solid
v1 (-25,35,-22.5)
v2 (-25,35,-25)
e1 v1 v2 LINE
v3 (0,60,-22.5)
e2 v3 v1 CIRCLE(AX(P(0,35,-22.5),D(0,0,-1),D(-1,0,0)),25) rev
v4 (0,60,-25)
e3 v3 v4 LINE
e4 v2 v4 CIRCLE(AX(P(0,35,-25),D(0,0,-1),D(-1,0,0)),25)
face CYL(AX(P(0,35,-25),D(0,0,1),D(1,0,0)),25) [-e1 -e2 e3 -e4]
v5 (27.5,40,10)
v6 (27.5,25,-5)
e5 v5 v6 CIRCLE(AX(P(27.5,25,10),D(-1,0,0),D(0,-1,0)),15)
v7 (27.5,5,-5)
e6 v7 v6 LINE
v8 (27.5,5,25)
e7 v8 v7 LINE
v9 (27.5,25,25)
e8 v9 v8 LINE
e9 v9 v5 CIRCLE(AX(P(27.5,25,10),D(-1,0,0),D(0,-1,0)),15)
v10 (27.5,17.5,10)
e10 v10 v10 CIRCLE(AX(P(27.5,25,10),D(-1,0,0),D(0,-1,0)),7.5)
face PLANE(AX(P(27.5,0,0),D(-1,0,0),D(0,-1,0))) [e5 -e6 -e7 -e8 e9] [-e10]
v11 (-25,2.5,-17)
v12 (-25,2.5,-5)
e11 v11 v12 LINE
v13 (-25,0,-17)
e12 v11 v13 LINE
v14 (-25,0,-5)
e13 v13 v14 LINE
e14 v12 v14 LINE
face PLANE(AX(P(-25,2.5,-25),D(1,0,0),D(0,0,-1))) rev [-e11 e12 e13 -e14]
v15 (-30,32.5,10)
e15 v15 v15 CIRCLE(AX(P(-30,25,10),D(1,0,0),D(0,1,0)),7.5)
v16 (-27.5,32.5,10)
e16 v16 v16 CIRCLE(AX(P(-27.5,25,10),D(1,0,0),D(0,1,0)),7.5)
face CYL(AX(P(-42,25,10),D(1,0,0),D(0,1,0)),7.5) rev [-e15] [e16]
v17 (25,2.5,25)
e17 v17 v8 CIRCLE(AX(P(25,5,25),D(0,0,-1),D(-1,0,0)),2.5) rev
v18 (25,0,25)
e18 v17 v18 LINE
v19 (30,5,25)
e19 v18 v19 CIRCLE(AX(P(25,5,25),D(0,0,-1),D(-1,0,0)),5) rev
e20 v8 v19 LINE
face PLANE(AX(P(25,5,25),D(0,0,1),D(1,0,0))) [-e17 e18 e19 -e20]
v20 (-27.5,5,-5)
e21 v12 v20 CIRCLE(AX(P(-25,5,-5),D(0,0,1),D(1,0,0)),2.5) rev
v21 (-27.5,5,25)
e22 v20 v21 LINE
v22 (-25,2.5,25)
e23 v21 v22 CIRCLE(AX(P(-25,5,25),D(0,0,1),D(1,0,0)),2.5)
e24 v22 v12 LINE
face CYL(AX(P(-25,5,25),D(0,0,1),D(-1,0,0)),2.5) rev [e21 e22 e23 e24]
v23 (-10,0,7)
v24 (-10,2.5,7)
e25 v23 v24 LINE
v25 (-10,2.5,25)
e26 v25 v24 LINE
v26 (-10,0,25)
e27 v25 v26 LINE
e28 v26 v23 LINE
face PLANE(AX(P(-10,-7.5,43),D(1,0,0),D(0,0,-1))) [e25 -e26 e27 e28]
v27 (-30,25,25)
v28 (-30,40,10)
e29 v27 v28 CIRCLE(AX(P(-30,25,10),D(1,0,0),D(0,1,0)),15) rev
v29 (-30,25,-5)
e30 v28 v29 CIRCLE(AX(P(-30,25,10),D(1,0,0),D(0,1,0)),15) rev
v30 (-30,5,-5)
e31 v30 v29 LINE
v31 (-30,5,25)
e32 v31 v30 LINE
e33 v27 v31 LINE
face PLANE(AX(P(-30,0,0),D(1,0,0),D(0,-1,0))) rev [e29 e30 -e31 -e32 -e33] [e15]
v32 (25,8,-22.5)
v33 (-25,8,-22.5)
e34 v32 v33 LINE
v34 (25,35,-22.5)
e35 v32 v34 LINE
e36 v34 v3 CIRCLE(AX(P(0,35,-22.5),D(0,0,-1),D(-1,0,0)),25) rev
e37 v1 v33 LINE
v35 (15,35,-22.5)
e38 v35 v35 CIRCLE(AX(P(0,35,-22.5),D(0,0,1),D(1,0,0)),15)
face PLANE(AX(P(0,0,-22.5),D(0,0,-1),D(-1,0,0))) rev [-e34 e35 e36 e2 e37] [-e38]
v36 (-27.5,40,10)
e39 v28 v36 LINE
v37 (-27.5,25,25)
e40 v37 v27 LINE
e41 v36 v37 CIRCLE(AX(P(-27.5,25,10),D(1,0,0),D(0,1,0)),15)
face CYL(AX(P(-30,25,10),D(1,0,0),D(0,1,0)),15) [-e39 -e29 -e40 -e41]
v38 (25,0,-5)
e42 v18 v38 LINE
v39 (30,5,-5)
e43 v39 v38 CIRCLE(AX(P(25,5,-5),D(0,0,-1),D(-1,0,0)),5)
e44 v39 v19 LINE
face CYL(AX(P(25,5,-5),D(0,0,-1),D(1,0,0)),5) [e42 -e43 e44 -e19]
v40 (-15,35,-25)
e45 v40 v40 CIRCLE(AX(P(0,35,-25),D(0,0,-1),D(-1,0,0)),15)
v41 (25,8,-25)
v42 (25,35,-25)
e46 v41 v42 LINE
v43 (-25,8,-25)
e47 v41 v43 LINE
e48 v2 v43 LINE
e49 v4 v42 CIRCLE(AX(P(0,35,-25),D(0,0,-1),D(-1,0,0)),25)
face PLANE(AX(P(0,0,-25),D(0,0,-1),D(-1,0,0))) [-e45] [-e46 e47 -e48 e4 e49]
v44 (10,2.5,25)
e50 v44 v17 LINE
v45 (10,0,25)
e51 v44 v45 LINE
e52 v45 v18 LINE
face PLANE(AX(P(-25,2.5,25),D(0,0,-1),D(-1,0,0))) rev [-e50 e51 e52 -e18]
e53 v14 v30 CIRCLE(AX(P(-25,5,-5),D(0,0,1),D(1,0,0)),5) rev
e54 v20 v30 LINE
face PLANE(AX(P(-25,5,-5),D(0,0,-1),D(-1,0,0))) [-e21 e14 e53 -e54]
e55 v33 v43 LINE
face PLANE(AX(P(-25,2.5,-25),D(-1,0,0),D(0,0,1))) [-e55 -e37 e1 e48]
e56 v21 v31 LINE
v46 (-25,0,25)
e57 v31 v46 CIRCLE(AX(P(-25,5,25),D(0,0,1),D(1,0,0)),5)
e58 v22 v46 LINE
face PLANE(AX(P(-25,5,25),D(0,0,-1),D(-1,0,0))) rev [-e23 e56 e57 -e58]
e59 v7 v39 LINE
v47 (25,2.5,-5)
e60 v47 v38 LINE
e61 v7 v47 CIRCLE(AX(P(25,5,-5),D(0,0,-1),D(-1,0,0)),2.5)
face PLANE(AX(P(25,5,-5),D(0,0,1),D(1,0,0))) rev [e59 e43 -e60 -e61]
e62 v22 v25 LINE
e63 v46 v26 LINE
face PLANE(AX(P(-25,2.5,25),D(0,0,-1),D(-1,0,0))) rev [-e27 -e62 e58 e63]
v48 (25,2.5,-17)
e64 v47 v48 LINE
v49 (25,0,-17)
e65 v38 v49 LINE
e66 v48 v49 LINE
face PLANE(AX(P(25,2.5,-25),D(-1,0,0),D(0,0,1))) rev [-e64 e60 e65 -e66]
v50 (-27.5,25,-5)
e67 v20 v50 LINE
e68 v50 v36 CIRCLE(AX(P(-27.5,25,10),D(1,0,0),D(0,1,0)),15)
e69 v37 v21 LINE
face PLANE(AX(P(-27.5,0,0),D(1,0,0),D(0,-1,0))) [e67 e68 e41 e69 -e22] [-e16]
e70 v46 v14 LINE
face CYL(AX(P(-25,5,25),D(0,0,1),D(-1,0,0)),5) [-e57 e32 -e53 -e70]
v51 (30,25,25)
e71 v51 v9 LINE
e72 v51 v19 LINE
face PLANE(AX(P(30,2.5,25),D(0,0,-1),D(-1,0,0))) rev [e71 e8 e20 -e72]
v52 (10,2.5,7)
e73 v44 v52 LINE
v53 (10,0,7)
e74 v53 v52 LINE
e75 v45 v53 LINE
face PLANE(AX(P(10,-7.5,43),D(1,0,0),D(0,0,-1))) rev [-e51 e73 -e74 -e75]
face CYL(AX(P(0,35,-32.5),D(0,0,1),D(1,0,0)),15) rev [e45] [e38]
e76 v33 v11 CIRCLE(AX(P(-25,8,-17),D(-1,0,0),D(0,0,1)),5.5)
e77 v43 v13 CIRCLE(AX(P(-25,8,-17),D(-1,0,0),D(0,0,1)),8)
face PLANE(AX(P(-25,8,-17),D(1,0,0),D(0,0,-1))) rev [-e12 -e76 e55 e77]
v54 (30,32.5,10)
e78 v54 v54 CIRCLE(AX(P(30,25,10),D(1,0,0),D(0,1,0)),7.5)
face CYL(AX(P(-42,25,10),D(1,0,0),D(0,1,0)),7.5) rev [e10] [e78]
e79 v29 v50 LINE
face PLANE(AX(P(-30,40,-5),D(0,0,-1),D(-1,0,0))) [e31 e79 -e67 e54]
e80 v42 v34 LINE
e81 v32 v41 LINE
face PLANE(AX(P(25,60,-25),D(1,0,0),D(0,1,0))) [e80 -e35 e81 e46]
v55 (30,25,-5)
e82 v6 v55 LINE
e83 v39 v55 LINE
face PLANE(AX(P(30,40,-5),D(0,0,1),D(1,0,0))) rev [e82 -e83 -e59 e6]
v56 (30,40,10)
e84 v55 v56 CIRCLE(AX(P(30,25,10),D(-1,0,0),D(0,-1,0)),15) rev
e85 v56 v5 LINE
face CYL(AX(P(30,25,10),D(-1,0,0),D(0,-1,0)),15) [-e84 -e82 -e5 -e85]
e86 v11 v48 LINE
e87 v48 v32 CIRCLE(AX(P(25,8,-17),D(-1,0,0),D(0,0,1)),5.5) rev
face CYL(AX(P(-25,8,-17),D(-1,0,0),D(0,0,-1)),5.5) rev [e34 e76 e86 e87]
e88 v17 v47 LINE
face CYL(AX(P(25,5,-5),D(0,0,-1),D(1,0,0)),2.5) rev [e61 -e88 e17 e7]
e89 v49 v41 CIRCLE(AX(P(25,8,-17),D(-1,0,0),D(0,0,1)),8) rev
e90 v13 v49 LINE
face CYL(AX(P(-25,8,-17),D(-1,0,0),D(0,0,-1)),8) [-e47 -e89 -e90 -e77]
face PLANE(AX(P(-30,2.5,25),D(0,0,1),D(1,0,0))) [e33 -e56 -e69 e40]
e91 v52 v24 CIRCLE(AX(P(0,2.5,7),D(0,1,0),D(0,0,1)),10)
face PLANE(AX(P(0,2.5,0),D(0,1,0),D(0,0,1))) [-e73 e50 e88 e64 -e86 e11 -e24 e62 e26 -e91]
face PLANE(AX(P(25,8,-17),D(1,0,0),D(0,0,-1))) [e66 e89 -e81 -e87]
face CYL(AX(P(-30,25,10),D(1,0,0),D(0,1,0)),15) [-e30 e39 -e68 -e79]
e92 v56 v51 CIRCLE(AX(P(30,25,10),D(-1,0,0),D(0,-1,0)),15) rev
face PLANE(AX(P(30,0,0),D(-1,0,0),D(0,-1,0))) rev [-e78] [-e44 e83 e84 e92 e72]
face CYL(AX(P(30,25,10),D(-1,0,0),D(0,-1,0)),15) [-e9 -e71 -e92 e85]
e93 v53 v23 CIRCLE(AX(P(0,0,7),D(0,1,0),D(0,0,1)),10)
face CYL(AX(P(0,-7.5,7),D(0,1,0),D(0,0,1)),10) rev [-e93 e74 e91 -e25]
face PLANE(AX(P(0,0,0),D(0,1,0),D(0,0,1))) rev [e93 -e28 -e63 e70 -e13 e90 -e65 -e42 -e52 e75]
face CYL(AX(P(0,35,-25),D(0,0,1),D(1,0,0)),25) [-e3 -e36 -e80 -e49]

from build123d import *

# Parameters (mm, degrees)
SKETCH1_W                    = 50
SKETCH1_H                    = 50
BASE_FLANGE1_DEPTH           = 2.5
EDGE_FLANGE2_STRIP_W         = 21
EDGE_FLANGE2_STRIP_H         = 2.5
EDGE_FLANGE2_STRIP_CUT_DEPTH = 50
EDGE_FLANGE2_DEPTH           = 50
BREAK_CORNER2_START          = -25
BREAK_CORNER2_DEPTH          = 2.5
EDGE_FLANGE4_DEPTH           = 30
SKETCH29_R                   = 15
CUT_EXTRUDE1_DEPTH           = 10
CUT_EXTRUDE2_DEPTH           = 10
BREAK_CORNER3_START          = -30
BREAK_CORNER3_DEPTH          = 60
SKETCH31_R                   = 7.5
CUT_EXTRUDE3_DEPTH           = 72


# Read off the part's stored shape, not the designer's step: Break-Corner2, Break-Corner3
# Sheet-metal steps are written as plain solids
with BuildPart() as part:
    # Sketch1 → Base-Flange1 (new body)
    with BuildSketch(Plane(origin=(0, 0, 0), x_dir=(1, 0, 0), z_dir=(0, 1, 0))):
        Rectangle(SKETCH1_W, SKETCH1_H)
    extrude(amount=BASE_FLANGE1_DEPTH)

    # Edge-Flange2 strip (across the edge) → Edge-Flange2 strip cut (cut)
    with BuildSketch(Plane(origin=(25, 2.5, -25), x_dir=(0, 0, 1), z_dir=(-1, 0, 0))):
        with Locations((-2.5, -1.25)):
            Rectangle(EDGE_FLANGE2_STRIP_W, EDGE_FLANGE2_STRIP_H)
    extrude(amount=EDGE_FLANGE2_STRIP_CUT_DEPTH, mode=Mode.SUBTRACT)

    # Edge-Flange2 section (across the edge) → Edge-Flange2 (add)
    with BuildSketch(Plane(origin=(25, 2.5, -25), x_dir=(0, 0, 1), z_dir=(-1, 0, 0))):
        with BuildLine():
            Line((0, 5.5), (0, 57.5))
            Line((0, 57.5), (2.5, 57.5))
            Line((2.5, 57.5), (2.5, 5.5))
            ThreePointArc((2.5, 5.5), (4.110912703, 1.610912703), (8, 0))
            Line((8, 0), (8, -2.5))
            ThreePointArc((8, -2.5), (2.343145751, -0.156854249), (0, 5.5))
        make_face()
    extrude(amount=EDGE_FLANGE2_DEPTH)

    # Break-Corner2 outline → Break-Corner2 (cut)
    with BuildSketch(Plane.XY.offset(BREAK_CORNER2_START)):
        with BuildLine():
            ThreePointArc((-25, 35), (-17.67766953, 52.67766953), (0, 60))
            Line((0, 60), (-25, 60))
            Line((-25, 60), (-25, 35))
        make_face()
        with BuildLine():
            ThreePointArc((0, 60), (17.67766953, 52.67766953), (25, 35))
            Line((25, 35), (25, 60))
            Line((25, 60), (0, 60))
        make_face()
    extrude(amount=BREAK_CORNER2_DEPTH, mode=Mode.SUBTRACT)

    # Edge-Flange4 section (across the edge) → Edge-Flange4 (add)
    with BuildSketch(Plane(origin=(27.5, 2.5, 25), x_dir=(-1, 0, 0), z_dir=(0, 0, -1))):
        with BuildLine():
            Line((-2.5, 2.5), (-2.5, 37.5))
            Line((-2.5, 37.5), (0, 37.5))
            Line((0, 37.5), (0, 2.5))
            ThreePointArc((0, 2.5), (0.732233047, 0.732233047), (2.5, 0))
            Line((2.5, 0), (2.5, -2.5))
            ThreePointArc((2.5, -2.5), (-1.035533906, -1.035533906), (-2.5, 2.5))
        make_face()
    edge_flange4 = extrude(amount=EDGE_FLANGE4_DEPTH)

    # Mirror1: Edge-Flange4 across plane
    add(edge_flange4.mirror(Plane(origin=(0, 0, 0), x_dir=(0, 0, 1), z_dir=(1, 0, 0))))

    # Sketch29 → Cut-Extrude1 (cut)
    with BuildSketch(Plane.XY.offset(-22.5)):
        with Locations((0, 35)):
            Circle(SKETCH29_R)
    extrude(amount=-CUT_EXTRUDE1_DEPTH, mode=Mode.SUBTRACT)

    # Sketch30 → Cut-Extrude2 (cut)
    with BuildSketch(Plane(origin=(0, 2.5, 0), x_dir=(1, 0, 0), z_dir=(0, 1, 0))):
        with BuildLine():
            Line((-10, -43), (10, -43))
            Line((10, -43), (10, -7))
            ThreePointArc((10, -7), (0, 3), (-10, -7))
            Line((-10, -7), (-10, -43))
        make_face()
    extrude(amount=-CUT_EXTRUDE2_DEPTH, mode=Mode.SUBTRACT)

    # Break-Corner3 outline → Break-Corner3 (cut)
    with BuildSketch(Plane.YZ.offset(BREAK_CORNER3_START)):
        with BuildLine():
            Line((40, -5), (40, 10))
            ThreePointArc((40, 10), (35.606601718, -0.606601718), (25, -5))
            Line((25, -5), (40, -5))
        make_face()
        with BuildLine():
            ThreePointArc((25, 25), (35.606601718, 20.606601718), (40, 10))
            Line((40, 10), (40, 25))
            Line((40, 25), (25, 25))
        make_face()
    extrude(amount=BREAK_CORNER3_DEPTH, mode=Mode.SUBTRACT)

    # Sketch31 → Cut-Extrude3 (cut)
    with BuildSketch(Plane(origin=(30, 0, 0), x_dir=(0, 0, -1), z_dir=(1, 0, 0))):
        with Locations(Location((-10, 25, 0), (0, 0, 90))):
            Circle(SKETCH31_R)
    extrude(amount=-CUT_EXTRUDE3_DEPTH, mode=Mode.SUBTRACT)


solid = part.part
